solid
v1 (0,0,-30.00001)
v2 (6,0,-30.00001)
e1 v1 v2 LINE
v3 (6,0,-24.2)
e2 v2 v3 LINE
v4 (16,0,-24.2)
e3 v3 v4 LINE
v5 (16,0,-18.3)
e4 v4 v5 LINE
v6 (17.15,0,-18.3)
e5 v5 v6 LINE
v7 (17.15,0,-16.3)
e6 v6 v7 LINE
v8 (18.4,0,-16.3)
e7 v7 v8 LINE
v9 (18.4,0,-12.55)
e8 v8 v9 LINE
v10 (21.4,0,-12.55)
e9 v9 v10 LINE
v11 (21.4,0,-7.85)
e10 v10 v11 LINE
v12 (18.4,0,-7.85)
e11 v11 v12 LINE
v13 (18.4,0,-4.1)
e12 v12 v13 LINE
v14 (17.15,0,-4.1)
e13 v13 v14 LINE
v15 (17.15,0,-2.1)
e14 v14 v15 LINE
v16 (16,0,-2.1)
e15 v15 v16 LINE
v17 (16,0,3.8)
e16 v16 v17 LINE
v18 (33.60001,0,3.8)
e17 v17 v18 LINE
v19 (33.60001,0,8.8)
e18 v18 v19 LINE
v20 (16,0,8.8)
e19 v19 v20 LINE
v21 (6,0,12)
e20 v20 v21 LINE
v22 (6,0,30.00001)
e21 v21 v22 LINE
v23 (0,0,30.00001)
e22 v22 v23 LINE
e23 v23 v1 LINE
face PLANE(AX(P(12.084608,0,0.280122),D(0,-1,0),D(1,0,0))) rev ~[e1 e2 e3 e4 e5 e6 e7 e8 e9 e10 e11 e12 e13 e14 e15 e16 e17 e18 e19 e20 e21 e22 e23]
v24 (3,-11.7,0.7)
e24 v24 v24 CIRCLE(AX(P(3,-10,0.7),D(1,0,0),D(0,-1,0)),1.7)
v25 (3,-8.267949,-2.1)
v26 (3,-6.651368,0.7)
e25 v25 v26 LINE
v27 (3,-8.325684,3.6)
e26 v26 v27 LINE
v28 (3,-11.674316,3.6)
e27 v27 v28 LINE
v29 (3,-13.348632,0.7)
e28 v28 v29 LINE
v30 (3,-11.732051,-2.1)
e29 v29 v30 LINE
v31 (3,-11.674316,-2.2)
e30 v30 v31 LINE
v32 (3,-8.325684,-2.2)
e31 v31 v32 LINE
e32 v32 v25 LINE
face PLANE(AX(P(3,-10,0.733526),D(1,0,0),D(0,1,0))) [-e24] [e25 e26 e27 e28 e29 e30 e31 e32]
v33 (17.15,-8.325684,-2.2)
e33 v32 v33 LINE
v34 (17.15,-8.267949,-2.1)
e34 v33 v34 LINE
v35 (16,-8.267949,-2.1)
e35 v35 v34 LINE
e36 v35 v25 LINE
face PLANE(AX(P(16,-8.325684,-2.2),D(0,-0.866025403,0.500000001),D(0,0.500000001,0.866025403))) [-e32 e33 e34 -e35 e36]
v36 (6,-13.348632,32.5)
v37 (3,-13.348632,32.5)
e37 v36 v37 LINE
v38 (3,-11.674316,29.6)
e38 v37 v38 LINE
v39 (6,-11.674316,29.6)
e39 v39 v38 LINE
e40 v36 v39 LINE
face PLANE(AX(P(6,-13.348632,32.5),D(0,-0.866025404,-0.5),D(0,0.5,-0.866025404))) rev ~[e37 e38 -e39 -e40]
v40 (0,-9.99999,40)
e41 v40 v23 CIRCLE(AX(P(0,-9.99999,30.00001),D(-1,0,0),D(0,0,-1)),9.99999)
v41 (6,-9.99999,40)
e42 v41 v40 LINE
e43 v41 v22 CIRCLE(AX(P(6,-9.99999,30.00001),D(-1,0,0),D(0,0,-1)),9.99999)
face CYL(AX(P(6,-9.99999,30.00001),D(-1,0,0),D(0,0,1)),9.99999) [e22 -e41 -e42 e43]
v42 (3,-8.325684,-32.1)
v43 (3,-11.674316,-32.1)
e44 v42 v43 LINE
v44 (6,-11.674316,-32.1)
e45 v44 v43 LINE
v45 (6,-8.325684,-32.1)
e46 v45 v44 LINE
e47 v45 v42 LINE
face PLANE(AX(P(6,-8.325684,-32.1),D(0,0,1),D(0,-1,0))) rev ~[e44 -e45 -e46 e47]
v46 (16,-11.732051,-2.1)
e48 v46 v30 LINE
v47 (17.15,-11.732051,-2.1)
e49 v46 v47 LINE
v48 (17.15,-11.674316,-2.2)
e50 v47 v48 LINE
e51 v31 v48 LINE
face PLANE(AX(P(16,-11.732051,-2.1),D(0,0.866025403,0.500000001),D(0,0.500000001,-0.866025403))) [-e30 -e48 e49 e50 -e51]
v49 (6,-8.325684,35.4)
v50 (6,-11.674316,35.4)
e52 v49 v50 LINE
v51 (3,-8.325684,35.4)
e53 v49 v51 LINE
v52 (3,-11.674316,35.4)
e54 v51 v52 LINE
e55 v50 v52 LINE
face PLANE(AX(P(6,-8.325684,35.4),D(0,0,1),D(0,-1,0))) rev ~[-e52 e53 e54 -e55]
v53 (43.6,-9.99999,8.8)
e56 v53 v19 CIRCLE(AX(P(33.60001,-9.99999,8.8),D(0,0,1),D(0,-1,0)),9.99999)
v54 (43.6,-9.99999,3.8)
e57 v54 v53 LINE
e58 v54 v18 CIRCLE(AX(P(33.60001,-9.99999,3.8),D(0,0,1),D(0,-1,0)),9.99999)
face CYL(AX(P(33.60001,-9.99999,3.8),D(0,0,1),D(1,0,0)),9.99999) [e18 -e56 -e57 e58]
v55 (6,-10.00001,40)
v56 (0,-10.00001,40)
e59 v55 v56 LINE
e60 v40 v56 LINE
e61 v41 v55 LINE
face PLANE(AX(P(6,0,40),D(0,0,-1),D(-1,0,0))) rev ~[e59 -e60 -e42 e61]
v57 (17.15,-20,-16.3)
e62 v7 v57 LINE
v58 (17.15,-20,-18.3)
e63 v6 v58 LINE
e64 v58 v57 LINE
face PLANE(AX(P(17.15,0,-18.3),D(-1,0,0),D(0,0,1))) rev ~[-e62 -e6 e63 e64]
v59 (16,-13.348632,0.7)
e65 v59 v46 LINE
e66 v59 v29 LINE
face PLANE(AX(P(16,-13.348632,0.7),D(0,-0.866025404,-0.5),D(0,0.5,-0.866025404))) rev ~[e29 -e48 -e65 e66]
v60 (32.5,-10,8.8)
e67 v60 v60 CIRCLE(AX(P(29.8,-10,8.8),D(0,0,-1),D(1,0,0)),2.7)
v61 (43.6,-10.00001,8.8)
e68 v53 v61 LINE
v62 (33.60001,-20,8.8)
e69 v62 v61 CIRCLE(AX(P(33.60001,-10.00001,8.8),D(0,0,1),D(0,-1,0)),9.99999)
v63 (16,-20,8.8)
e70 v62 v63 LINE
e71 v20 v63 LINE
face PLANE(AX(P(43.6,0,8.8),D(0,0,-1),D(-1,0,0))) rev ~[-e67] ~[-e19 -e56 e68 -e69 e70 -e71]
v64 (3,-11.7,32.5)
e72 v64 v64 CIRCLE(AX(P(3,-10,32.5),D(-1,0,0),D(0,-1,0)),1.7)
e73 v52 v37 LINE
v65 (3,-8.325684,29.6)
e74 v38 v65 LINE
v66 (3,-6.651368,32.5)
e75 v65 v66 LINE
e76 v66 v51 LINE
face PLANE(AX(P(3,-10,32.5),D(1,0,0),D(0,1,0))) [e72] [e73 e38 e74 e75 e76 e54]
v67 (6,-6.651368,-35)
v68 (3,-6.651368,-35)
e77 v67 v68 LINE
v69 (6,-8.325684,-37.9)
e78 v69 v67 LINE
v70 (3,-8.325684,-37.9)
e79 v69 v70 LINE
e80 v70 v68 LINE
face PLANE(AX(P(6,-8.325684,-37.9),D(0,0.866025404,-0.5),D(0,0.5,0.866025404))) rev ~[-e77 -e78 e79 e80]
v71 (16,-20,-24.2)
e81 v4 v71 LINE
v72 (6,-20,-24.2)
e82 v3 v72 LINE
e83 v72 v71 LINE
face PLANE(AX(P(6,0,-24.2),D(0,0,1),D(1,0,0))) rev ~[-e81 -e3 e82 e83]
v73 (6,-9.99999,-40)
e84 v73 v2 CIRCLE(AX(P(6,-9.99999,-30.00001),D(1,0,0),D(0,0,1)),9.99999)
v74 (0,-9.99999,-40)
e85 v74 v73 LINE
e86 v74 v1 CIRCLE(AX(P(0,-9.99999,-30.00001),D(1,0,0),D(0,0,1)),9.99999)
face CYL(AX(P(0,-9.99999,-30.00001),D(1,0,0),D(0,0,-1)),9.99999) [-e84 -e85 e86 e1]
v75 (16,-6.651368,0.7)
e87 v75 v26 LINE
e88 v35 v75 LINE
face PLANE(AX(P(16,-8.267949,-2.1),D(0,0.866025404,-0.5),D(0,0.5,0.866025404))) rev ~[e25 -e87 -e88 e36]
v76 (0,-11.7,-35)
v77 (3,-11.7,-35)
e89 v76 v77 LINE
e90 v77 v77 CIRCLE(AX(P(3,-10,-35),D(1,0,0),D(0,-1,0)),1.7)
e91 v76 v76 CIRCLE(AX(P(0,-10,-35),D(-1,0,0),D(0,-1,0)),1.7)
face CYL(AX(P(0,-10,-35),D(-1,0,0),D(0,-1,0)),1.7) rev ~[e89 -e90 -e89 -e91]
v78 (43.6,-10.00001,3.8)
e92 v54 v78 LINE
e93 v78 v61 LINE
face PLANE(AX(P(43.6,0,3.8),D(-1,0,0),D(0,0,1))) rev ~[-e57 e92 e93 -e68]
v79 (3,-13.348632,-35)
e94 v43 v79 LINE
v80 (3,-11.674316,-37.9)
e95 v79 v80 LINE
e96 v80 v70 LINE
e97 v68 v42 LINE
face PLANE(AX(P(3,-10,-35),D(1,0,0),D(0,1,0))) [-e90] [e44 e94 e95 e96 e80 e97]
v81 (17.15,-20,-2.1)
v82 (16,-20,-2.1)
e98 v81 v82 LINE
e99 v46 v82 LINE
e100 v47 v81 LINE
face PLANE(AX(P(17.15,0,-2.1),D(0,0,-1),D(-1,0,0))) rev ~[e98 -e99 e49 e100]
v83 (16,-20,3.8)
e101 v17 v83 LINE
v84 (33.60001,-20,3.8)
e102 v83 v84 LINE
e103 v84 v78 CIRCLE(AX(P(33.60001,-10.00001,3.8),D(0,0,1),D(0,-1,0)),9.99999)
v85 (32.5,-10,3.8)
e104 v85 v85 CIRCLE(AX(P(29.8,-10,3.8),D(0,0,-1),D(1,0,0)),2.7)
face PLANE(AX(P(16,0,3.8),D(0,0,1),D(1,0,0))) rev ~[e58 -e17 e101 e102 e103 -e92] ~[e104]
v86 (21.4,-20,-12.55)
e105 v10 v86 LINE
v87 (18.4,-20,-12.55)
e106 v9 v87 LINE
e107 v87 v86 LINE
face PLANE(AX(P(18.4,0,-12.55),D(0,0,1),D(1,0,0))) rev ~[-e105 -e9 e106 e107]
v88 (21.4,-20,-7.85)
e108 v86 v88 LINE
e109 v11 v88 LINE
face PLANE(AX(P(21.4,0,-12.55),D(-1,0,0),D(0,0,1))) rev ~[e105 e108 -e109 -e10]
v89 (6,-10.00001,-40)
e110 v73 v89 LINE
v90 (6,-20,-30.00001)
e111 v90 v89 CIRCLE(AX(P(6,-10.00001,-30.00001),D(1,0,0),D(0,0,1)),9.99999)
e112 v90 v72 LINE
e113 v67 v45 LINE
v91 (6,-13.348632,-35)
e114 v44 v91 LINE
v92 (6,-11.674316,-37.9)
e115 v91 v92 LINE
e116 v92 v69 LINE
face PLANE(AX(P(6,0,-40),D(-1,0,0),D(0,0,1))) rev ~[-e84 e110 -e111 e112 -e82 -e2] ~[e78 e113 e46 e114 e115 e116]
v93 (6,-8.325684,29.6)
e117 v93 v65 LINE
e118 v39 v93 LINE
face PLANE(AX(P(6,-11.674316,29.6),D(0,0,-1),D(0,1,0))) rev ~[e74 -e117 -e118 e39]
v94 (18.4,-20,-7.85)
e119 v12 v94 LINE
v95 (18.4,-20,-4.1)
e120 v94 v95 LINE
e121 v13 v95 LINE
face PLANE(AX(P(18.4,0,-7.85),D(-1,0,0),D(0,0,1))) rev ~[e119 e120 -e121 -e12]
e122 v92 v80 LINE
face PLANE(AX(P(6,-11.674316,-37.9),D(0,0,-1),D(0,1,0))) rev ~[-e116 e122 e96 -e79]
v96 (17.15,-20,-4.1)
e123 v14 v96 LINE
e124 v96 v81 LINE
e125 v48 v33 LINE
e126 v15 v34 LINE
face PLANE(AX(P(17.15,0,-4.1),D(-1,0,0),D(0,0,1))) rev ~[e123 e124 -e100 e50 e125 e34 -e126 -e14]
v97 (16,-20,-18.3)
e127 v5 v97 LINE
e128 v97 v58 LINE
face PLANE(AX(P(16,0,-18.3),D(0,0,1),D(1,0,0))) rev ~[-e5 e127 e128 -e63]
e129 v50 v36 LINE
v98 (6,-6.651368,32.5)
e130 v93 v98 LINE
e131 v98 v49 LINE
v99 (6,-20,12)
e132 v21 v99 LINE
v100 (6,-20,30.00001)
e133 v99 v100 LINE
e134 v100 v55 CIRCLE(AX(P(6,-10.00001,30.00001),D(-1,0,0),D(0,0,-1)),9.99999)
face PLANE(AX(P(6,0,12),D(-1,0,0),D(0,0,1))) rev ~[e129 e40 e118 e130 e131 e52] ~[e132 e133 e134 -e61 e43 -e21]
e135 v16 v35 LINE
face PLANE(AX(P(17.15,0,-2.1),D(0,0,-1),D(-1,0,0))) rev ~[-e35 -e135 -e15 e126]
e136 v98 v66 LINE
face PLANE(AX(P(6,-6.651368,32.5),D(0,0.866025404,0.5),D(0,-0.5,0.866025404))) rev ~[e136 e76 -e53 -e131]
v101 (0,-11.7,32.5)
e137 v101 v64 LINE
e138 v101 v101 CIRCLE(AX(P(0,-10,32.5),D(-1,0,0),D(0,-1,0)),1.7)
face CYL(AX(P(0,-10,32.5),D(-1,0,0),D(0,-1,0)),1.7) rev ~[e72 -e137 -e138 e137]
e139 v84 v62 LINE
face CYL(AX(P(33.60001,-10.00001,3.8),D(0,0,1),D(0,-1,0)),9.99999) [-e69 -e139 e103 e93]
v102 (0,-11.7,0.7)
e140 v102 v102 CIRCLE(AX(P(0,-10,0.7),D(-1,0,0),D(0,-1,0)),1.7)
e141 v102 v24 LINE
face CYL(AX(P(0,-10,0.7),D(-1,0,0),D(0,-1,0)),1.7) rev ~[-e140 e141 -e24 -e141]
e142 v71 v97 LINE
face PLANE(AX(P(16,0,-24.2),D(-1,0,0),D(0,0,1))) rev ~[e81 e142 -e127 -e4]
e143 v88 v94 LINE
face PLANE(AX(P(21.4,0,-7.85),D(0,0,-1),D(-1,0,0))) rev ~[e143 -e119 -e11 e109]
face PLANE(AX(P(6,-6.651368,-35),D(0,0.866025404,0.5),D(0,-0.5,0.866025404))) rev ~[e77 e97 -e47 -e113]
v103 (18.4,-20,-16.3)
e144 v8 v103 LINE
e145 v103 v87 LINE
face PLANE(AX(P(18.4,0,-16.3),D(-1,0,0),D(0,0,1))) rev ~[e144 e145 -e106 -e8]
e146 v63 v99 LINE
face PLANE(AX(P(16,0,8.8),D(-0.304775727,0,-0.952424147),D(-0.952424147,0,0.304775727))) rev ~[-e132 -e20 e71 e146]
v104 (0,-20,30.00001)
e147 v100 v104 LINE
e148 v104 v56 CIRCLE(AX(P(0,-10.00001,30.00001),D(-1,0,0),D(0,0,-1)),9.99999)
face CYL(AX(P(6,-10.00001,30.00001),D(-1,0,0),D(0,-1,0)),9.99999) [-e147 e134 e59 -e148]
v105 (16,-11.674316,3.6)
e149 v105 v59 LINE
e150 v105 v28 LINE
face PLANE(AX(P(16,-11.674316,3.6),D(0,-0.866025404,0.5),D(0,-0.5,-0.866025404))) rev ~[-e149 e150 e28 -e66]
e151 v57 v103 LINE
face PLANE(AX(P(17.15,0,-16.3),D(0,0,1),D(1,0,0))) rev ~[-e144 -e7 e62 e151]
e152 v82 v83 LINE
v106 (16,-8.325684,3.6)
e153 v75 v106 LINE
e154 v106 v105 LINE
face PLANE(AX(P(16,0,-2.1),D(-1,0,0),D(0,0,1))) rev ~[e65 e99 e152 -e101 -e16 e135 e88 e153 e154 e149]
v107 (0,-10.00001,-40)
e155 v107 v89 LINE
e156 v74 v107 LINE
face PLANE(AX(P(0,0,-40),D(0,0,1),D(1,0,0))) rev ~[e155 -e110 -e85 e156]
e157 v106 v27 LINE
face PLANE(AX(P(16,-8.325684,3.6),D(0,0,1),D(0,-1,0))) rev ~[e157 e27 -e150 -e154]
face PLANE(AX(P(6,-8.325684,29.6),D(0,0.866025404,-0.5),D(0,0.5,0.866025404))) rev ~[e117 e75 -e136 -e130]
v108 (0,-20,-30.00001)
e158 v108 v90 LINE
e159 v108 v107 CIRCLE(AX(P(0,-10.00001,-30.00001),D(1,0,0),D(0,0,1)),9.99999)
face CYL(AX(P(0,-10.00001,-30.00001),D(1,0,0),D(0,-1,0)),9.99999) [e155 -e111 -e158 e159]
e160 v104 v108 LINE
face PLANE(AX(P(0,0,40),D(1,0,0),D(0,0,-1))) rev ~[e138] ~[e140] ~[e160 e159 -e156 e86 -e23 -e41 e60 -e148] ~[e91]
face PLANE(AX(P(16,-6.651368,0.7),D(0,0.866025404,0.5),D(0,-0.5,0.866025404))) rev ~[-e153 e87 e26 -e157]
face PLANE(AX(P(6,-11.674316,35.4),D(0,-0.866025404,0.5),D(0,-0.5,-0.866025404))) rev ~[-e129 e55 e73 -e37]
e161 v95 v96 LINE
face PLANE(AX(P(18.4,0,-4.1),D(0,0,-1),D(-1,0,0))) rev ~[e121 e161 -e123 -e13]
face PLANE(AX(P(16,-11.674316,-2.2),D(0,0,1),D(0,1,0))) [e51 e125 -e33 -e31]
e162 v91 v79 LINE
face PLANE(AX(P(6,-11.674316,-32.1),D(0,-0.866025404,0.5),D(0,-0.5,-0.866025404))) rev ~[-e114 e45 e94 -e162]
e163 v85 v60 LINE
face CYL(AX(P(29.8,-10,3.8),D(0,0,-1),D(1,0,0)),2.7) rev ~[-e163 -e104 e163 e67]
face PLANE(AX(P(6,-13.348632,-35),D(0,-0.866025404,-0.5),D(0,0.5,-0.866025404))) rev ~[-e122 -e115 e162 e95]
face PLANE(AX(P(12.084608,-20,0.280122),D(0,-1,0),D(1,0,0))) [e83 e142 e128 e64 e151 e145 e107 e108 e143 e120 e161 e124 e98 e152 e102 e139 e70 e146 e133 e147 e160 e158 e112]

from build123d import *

# Parameters (mm, degrees)
F1_DEPTH       = 20
F2_R           = 2.7
F3_DEPTH       = 5
F4_R           = 1.7
F5_DEPTH       = 16.001
F6_R           = 1.7
F7_R           = 1.7
F9_DEPTH       = 3
F8_R           = 1.7
F10_DEPTH      = 5.4
F10_DEPTH_BACK = 13
F11_R          = 9.99999


# Not quite as in the source:
# - a fillet or chamfer is up to 0.001 mm smaller than in the source, because OpenCascade refuses the exact size


with BuildPart() as f1:
    # F0 (on Front) → F1 (new body)
    with BuildSketch(Plane.XZ):
        Polygon((16, 8.8), (6, 12), (6, 40), (0, 40), (0, -40), (6, -40), (6, -24.2), (16, -24.2), (16, -18.3), (17.15, -18.3), (17.15, -16.3), (18.4, -16.3), (18.4, -12.55), (21.4, -12.55), (21.4, -7.85), (18.4, -7.85), (18.4, -4.1), (17.15, -4.1), (17.15, -2.1), (16, -2.1), (16, 3.8), (43.6, 3.8), (43.6, 8.8), align=None)
    extrude(amount=F1_DEPTH)

    # F2 (on face) → F3 (cut, through all)
    with BuildSketch(Plane(origin=(0, 0, 3.8), x_dir=(1, 0, 0), z_dir=(0, 0, -1))):
        with Locations((29.8, 10)):
            Circle(F2_R)
    extrude(amount=-F3_DEPTH, mode=Mode.SUBTRACT)

    # F4 (on face) → F5 (cut, through all)
    with BuildSketch(Plane(origin=(0, 0, 0), x_dir=(0, -1, 0), z_dir=(-1, 0, 0))):
        with Locations((10, 32.5)):
            Circle(F4_R)
        with Locations((10, 0.7)):
            Circle(F4_R)
        with Locations((10, -35)):
            Circle(F4_R)
    extrude(amount=-F5_DEPTH, mode=Mode.SUBTRACT)

    # F6 (on face) + F7 (on face) → F9 (cut)
    with BuildSketch(Plane.YZ.offset(6)):
        Polygon((-13.3486315613, 32.5), (-11.6743157806, 29.6), (-8.3256842194, 29.6), (-6.6513684387, 32.5), (-8.3256842194, 35.4), (-11.6743157806, 35.4), align=None)
        with Locations((-10, 32.5)):
            Circle(F6_R, mode=Mode.SUBTRACT)
        with Locations((-10, 32.5)):
            Circle(F6_R)
    with BuildSketch(Plane.YZ.offset(6)):
        Polygon((-8.3256842194, -37.8999999998), (-6.6513684387, -34.9999999998), (-8.3256842194, -32.0999999998), (-11.6743157806, -32.0999999998), (-13.3486315613, -34.9999999998), (-11.6743157806, -37.8999999998), align=None)
        with Locations((-10, -35)):
            Circle(F7_R, mode=Mode.SUBTRACT)
    extrude(amount=-F9_DEPTH, mode=Mode.SUBTRACT)

    # F8 (on face) → F10 (cut, two sides)
    with BuildSketch(Plane.YZ.offset(16)) as f10_sk:
        Polygon((-13.3486315613, 0.7), (-11.7320508076, -2.1), (-8.2679491924, -2.1), (-6.6513684387, 0.7), (-8.3256842194, 3.6), (-11.6743157806, 3.6), align=None)
        with Locations((-10, 0.7)):
            Circle(F8_R, mode=Mode.SUBTRACT)
        Polygon((-11.7320508076, -2.1), (-11.6743157806, -2.2), (-8.3256842194, -2.2), (-8.2679491924, -2.1), align=None)
    extrude(amount=F10_DEPTH, mode=Mode.SUBTRACT)
    extrude(f10_sk.sketch, amount=-F10_DEPTH_BACK, mode=Mode.SUBTRACT)

    # F11 (radius 10 in the source; OpenCascade refuses exactly that, so slightly less here)
    f11_edges = [f1.edges().sort_by_distance(p)[0] for p in [
        (3, -20, 40),
        (3, 0, 40),
        (3, -20, -40),
        (3, 0, -40),
        (43.6, 0, 6.3),
        (43.6, -20, 6.3),
    ]]
    fillet(f11_edges, radius=F11_R)


solid = f1.part
